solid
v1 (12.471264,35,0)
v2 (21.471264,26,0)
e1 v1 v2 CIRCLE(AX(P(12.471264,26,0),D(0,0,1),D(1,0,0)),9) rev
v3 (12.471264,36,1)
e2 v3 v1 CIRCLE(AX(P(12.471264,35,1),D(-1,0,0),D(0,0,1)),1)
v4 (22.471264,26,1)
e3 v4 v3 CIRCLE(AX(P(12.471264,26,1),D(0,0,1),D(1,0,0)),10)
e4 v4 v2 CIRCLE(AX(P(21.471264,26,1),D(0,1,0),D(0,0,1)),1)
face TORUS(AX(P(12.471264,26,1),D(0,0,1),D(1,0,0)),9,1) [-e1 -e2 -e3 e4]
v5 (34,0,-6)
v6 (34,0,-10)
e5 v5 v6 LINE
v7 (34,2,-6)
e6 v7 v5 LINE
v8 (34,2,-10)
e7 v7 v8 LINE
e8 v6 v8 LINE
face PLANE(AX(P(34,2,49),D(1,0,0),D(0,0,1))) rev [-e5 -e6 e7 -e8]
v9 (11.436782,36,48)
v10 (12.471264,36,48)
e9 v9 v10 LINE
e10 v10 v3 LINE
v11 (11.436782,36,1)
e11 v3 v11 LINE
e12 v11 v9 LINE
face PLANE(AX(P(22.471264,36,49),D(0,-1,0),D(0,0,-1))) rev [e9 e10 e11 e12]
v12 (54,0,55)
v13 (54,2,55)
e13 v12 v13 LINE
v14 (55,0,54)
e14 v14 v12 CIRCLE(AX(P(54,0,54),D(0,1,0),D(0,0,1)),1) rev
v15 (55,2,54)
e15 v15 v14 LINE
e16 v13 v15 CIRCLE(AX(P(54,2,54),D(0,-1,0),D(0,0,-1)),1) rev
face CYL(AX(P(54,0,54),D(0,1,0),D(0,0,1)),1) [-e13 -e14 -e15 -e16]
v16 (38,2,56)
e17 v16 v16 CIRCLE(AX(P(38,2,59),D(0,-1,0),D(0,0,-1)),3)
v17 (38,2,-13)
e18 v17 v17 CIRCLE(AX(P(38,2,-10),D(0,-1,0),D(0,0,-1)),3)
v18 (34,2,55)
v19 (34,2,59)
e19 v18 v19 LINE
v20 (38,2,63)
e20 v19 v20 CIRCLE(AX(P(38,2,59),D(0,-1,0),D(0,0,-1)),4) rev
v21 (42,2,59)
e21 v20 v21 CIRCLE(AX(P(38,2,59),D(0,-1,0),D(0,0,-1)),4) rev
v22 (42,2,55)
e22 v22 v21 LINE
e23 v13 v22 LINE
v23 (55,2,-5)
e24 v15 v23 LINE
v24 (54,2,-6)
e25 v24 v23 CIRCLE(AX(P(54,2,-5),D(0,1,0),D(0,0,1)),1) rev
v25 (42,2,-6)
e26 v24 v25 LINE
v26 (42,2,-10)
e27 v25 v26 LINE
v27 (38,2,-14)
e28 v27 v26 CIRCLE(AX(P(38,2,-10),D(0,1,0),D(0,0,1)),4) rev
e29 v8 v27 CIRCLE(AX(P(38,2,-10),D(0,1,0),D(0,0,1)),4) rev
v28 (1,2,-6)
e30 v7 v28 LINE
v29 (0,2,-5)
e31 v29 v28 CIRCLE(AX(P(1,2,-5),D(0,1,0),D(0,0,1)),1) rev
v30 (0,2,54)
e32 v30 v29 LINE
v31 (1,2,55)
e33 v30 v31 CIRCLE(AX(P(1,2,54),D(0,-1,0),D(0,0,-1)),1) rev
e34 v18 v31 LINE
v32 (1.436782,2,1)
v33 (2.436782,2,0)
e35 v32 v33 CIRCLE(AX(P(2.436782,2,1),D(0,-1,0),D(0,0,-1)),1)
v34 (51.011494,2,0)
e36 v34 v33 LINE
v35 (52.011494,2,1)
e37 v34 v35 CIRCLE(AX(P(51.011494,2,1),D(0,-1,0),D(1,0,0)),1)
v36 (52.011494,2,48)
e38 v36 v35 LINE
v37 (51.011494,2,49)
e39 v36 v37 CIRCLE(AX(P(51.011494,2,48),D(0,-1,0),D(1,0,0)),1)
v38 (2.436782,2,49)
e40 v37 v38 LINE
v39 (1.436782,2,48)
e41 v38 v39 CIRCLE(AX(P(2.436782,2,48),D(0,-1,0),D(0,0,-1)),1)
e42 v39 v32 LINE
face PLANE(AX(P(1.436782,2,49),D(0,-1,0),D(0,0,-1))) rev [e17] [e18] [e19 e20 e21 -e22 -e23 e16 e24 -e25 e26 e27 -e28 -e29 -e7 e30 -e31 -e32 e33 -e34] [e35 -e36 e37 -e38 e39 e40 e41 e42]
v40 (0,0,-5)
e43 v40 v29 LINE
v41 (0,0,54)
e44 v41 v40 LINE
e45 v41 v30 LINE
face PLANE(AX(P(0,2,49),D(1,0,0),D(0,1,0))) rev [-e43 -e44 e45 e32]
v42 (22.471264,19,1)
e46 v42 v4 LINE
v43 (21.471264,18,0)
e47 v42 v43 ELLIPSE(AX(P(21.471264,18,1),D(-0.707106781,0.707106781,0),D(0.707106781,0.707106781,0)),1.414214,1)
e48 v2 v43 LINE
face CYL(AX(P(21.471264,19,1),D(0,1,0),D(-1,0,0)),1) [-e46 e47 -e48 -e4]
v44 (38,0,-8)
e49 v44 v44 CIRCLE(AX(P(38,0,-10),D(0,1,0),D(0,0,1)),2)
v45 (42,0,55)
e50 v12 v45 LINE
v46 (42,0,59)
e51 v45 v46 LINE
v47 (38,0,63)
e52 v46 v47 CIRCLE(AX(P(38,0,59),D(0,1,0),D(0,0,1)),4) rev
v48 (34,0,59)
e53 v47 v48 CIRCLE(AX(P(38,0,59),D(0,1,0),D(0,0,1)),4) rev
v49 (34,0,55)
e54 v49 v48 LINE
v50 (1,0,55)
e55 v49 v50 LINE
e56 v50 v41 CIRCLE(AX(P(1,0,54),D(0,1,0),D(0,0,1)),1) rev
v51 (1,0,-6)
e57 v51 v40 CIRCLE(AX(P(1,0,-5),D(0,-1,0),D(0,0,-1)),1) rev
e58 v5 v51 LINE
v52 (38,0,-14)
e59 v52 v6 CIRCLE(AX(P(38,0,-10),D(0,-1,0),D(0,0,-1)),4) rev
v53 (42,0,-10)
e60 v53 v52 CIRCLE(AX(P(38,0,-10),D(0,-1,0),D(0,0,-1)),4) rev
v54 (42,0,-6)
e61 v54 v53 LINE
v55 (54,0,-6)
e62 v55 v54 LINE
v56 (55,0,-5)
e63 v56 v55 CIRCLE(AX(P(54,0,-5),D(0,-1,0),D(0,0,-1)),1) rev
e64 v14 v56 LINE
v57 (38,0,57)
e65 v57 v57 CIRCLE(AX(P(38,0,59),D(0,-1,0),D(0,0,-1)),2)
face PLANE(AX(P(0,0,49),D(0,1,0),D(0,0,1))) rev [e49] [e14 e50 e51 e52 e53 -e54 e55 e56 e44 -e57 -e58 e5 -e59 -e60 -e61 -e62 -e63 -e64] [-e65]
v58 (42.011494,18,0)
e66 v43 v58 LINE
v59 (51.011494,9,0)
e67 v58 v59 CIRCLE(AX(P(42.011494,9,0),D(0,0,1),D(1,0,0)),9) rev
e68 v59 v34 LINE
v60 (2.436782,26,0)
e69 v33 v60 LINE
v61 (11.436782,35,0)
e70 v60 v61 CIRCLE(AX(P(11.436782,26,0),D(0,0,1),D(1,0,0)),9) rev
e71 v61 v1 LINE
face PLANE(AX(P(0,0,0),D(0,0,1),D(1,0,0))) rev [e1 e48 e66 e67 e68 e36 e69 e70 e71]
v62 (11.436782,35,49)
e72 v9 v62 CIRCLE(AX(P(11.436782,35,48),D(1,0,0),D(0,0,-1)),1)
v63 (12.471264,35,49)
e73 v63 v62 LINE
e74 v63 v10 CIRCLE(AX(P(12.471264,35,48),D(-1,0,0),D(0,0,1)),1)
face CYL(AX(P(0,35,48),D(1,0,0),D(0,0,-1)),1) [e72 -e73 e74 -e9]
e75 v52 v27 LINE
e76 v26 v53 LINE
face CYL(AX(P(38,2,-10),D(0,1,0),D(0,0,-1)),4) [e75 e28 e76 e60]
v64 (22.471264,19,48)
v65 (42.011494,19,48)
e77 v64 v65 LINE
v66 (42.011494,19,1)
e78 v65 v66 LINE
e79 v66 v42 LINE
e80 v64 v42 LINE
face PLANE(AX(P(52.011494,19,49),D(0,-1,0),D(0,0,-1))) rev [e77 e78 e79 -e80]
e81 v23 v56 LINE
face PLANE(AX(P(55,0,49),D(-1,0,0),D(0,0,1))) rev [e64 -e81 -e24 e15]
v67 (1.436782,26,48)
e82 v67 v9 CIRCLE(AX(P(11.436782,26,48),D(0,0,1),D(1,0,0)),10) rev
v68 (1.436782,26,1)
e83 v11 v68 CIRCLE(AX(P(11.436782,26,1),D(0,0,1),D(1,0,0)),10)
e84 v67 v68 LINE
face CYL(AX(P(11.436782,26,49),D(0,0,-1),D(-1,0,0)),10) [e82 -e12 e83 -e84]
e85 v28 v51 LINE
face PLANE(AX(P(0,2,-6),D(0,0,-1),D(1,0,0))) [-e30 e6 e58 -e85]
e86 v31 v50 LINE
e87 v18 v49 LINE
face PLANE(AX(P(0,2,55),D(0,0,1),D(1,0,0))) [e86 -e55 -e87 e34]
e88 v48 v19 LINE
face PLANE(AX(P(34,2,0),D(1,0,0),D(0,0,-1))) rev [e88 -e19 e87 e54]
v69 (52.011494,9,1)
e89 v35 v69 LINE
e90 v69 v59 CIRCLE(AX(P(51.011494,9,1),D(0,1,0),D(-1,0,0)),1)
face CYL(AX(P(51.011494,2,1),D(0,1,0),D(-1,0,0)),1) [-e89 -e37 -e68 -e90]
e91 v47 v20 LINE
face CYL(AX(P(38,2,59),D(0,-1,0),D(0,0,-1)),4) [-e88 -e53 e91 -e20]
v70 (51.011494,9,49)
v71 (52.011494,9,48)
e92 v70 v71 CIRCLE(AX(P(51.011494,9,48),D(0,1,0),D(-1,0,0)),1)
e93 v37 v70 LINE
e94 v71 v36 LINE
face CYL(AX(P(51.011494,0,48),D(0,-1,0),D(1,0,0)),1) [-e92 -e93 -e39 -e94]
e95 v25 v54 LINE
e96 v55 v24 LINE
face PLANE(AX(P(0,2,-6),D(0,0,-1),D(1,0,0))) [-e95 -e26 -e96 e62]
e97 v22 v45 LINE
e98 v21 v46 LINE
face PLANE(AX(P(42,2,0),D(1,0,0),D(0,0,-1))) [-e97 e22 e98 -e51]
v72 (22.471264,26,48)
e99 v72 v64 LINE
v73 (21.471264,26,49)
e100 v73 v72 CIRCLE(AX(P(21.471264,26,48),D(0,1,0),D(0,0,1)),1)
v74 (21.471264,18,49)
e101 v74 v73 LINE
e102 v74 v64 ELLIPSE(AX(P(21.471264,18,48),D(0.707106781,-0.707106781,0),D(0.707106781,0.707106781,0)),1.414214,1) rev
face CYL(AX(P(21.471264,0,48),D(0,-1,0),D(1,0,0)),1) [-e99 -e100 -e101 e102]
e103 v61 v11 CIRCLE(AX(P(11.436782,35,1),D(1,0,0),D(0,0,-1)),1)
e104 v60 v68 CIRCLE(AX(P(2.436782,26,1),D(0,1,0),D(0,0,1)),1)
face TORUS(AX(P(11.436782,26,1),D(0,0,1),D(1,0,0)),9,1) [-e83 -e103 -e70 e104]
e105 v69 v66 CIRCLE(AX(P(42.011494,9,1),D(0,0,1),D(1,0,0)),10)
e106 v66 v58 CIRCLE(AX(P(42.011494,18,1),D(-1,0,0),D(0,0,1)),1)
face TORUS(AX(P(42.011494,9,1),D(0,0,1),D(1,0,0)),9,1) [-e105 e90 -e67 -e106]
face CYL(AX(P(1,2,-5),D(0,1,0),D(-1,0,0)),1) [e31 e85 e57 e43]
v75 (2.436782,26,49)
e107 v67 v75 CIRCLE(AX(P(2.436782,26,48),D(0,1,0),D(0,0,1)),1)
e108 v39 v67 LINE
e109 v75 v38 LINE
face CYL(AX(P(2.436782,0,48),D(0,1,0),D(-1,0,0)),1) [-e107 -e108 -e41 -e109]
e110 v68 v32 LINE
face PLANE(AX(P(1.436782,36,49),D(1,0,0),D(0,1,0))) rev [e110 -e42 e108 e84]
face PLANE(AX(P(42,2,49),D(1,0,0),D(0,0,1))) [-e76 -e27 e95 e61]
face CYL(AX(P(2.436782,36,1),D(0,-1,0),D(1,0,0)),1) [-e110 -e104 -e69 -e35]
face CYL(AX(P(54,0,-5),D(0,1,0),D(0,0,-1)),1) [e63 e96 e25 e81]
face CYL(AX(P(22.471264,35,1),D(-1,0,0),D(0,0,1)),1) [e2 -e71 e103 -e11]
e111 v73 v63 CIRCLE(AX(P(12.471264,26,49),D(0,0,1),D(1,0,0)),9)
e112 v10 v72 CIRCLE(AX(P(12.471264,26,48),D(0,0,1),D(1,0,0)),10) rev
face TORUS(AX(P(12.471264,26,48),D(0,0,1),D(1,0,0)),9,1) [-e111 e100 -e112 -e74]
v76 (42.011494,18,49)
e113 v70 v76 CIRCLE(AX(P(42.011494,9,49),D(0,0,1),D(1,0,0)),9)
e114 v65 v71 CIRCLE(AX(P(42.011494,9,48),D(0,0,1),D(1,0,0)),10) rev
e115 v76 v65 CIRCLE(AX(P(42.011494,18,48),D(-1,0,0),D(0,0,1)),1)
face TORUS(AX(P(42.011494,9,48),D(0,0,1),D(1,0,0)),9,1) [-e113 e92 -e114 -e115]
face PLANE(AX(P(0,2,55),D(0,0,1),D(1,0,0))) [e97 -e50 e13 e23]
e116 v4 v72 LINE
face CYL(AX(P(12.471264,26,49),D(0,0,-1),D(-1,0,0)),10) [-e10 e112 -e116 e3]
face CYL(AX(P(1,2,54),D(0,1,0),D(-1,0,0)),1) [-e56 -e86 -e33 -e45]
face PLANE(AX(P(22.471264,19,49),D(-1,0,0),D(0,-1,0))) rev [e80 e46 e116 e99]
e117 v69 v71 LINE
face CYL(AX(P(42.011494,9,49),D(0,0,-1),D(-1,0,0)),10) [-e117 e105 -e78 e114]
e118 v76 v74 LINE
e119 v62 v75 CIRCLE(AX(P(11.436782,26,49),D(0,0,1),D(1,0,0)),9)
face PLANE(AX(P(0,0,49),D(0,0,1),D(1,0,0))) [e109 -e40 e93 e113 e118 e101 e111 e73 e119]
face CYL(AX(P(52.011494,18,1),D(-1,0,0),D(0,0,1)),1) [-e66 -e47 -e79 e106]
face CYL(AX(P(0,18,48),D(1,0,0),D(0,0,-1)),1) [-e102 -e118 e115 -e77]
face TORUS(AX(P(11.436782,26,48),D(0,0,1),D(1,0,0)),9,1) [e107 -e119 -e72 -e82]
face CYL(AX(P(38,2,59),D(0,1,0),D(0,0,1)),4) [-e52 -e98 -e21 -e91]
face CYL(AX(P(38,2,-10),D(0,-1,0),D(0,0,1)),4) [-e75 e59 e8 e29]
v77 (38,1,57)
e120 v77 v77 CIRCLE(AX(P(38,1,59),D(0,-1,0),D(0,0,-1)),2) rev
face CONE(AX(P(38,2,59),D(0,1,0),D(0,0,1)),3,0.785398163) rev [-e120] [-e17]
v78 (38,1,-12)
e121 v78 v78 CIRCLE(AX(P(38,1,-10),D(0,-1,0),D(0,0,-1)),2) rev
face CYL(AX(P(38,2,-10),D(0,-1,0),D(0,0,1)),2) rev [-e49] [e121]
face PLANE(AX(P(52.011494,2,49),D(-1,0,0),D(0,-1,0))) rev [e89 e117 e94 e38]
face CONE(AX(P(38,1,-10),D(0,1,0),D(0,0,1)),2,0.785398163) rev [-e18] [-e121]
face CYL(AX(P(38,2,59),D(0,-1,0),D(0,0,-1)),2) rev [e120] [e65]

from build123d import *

# Parameters (mm, degrees)
BOSS_EXTRUDE1_DEPTH = 49
FILLET1_R           = 10
FILLET2_R           = 1
SKETCH2_W           = 55
SKETCH2_H           = 6
SKETCH2_W_2         = 8
SKETCH2_H_2         = 8
SKETCH2_R           = 2
BOSS_EXTRUDE2_DEPTH = 2
FILLET3_R           = 4
FILLET4_R           = 1
CHAMFER1_SIZE       = 1


with BuildPart() as part:
    # Sketch1 → Boss-Extrude1 (new body)
    with BuildSketch(Plane.XY):
        Polygon((0, 0), (55, 0), (55, 2), (52.011494253, 2), (52.011494253, 19), (22.471264368, 19), (22.471264368, 36), (1.436781609, 36), (1.436781609, 2), (0, 2), align=None)
    extrude(amount=BOSS_EXTRUDE1_DEPTH)

    # Fillet1
    fillet1_edges = [part.edges().sort_by_distance(p)[0] for p in [
        (1.436781609, 36, 24.5),
        (22.471264368, 36, 24.5),
        (52.011494253, 19, 24.5),
    ]]
    fillet(fillet1_edges, radius=FILLET1_R)

    # Fillet2
    fillet2_edges = [part.edges().sort_by_distance(p)[0] for p in [
        (22.471264368, 22.5, 0),
        (52.011494253, 5.5, 0),
        (52.011494253, 5.5, 49),
        (22.471264368, 22.5, 49),
        (32.24137931, 19, 0),
        (32.24137931, 19, 49),
        (1.436781609, 14, 0),
        (11.954022989, 36, 0),
        (19.54233218, 33.071067812, 0),
        (4.365713797, 33.071067812, 0),
        (49.082562065, 16.071067812, 0),
        (11.954022989, 36, 49),
        (1.436781609, 14, 49),
        (19.54233218, 33.071067812, 49),
        (4.365713797, 33.071067812, 49),
        (49.082562065, 16.071067812, 49),
    ]]
    fillet(fillet2_edges, radius=FILLET2_R)

    # Sketch2 → Boss-Extrude2 (add)
    # profile 1 of 2: a face of its own
    with BuildSketch(Plane.XZ):
        with Locations((27.5, 52)):
            Rectangle(SKETCH2_W, SKETCH2_H)
    # profile 2 of 2: a face of its own
    with BuildSketch(Plane.XZ):
        with Locations((38, 59)):
            Rectangle(SKETCH2_W_2, SKETCH2_H_2)
        with Locations(Location((38, 59, 0), (0, 0, 270))):
            Circle(SKETCH2_R, mode=Mode.SUBTRACT)
    extrude(amount=-BOSS_EXTRUDE2_DEPTH)

    # Fillet3
    fillet3_edges = [part.edges().sort_by_distance(p)[0] for p in [
        (34, 1, 63),
        (42, 1, 63),
    ]]
    fillet(fillet3_edges, radius=FILLET3_R - 0.0001)  # a hair under: the kernel refuses the full size

    # Fillet4
    fillet4_edges = [part.edges().sort_by_distance(p)[0] for p in [
        (0, 1, 55),
        (55, 1, 55),
    ]]
    fillet(fillet4_edges, radius=FILLET4_R)

    # Mirror7: part across plane


with BuildPart() as part_1:
    add(part.part)
    add(part.part.mirror(Plane.XY.offset(24.5)))

    # Chamfer1
    chamfer1_edges = [part_1.edges().sort_by_distance(p)[0] for p in [
        (38, 2, 61),
        (38, 2, -12),
    ]]
    chamfer(chamfer1_edges, length=CHAMFER1_SIZE)


solid = part_1.part
